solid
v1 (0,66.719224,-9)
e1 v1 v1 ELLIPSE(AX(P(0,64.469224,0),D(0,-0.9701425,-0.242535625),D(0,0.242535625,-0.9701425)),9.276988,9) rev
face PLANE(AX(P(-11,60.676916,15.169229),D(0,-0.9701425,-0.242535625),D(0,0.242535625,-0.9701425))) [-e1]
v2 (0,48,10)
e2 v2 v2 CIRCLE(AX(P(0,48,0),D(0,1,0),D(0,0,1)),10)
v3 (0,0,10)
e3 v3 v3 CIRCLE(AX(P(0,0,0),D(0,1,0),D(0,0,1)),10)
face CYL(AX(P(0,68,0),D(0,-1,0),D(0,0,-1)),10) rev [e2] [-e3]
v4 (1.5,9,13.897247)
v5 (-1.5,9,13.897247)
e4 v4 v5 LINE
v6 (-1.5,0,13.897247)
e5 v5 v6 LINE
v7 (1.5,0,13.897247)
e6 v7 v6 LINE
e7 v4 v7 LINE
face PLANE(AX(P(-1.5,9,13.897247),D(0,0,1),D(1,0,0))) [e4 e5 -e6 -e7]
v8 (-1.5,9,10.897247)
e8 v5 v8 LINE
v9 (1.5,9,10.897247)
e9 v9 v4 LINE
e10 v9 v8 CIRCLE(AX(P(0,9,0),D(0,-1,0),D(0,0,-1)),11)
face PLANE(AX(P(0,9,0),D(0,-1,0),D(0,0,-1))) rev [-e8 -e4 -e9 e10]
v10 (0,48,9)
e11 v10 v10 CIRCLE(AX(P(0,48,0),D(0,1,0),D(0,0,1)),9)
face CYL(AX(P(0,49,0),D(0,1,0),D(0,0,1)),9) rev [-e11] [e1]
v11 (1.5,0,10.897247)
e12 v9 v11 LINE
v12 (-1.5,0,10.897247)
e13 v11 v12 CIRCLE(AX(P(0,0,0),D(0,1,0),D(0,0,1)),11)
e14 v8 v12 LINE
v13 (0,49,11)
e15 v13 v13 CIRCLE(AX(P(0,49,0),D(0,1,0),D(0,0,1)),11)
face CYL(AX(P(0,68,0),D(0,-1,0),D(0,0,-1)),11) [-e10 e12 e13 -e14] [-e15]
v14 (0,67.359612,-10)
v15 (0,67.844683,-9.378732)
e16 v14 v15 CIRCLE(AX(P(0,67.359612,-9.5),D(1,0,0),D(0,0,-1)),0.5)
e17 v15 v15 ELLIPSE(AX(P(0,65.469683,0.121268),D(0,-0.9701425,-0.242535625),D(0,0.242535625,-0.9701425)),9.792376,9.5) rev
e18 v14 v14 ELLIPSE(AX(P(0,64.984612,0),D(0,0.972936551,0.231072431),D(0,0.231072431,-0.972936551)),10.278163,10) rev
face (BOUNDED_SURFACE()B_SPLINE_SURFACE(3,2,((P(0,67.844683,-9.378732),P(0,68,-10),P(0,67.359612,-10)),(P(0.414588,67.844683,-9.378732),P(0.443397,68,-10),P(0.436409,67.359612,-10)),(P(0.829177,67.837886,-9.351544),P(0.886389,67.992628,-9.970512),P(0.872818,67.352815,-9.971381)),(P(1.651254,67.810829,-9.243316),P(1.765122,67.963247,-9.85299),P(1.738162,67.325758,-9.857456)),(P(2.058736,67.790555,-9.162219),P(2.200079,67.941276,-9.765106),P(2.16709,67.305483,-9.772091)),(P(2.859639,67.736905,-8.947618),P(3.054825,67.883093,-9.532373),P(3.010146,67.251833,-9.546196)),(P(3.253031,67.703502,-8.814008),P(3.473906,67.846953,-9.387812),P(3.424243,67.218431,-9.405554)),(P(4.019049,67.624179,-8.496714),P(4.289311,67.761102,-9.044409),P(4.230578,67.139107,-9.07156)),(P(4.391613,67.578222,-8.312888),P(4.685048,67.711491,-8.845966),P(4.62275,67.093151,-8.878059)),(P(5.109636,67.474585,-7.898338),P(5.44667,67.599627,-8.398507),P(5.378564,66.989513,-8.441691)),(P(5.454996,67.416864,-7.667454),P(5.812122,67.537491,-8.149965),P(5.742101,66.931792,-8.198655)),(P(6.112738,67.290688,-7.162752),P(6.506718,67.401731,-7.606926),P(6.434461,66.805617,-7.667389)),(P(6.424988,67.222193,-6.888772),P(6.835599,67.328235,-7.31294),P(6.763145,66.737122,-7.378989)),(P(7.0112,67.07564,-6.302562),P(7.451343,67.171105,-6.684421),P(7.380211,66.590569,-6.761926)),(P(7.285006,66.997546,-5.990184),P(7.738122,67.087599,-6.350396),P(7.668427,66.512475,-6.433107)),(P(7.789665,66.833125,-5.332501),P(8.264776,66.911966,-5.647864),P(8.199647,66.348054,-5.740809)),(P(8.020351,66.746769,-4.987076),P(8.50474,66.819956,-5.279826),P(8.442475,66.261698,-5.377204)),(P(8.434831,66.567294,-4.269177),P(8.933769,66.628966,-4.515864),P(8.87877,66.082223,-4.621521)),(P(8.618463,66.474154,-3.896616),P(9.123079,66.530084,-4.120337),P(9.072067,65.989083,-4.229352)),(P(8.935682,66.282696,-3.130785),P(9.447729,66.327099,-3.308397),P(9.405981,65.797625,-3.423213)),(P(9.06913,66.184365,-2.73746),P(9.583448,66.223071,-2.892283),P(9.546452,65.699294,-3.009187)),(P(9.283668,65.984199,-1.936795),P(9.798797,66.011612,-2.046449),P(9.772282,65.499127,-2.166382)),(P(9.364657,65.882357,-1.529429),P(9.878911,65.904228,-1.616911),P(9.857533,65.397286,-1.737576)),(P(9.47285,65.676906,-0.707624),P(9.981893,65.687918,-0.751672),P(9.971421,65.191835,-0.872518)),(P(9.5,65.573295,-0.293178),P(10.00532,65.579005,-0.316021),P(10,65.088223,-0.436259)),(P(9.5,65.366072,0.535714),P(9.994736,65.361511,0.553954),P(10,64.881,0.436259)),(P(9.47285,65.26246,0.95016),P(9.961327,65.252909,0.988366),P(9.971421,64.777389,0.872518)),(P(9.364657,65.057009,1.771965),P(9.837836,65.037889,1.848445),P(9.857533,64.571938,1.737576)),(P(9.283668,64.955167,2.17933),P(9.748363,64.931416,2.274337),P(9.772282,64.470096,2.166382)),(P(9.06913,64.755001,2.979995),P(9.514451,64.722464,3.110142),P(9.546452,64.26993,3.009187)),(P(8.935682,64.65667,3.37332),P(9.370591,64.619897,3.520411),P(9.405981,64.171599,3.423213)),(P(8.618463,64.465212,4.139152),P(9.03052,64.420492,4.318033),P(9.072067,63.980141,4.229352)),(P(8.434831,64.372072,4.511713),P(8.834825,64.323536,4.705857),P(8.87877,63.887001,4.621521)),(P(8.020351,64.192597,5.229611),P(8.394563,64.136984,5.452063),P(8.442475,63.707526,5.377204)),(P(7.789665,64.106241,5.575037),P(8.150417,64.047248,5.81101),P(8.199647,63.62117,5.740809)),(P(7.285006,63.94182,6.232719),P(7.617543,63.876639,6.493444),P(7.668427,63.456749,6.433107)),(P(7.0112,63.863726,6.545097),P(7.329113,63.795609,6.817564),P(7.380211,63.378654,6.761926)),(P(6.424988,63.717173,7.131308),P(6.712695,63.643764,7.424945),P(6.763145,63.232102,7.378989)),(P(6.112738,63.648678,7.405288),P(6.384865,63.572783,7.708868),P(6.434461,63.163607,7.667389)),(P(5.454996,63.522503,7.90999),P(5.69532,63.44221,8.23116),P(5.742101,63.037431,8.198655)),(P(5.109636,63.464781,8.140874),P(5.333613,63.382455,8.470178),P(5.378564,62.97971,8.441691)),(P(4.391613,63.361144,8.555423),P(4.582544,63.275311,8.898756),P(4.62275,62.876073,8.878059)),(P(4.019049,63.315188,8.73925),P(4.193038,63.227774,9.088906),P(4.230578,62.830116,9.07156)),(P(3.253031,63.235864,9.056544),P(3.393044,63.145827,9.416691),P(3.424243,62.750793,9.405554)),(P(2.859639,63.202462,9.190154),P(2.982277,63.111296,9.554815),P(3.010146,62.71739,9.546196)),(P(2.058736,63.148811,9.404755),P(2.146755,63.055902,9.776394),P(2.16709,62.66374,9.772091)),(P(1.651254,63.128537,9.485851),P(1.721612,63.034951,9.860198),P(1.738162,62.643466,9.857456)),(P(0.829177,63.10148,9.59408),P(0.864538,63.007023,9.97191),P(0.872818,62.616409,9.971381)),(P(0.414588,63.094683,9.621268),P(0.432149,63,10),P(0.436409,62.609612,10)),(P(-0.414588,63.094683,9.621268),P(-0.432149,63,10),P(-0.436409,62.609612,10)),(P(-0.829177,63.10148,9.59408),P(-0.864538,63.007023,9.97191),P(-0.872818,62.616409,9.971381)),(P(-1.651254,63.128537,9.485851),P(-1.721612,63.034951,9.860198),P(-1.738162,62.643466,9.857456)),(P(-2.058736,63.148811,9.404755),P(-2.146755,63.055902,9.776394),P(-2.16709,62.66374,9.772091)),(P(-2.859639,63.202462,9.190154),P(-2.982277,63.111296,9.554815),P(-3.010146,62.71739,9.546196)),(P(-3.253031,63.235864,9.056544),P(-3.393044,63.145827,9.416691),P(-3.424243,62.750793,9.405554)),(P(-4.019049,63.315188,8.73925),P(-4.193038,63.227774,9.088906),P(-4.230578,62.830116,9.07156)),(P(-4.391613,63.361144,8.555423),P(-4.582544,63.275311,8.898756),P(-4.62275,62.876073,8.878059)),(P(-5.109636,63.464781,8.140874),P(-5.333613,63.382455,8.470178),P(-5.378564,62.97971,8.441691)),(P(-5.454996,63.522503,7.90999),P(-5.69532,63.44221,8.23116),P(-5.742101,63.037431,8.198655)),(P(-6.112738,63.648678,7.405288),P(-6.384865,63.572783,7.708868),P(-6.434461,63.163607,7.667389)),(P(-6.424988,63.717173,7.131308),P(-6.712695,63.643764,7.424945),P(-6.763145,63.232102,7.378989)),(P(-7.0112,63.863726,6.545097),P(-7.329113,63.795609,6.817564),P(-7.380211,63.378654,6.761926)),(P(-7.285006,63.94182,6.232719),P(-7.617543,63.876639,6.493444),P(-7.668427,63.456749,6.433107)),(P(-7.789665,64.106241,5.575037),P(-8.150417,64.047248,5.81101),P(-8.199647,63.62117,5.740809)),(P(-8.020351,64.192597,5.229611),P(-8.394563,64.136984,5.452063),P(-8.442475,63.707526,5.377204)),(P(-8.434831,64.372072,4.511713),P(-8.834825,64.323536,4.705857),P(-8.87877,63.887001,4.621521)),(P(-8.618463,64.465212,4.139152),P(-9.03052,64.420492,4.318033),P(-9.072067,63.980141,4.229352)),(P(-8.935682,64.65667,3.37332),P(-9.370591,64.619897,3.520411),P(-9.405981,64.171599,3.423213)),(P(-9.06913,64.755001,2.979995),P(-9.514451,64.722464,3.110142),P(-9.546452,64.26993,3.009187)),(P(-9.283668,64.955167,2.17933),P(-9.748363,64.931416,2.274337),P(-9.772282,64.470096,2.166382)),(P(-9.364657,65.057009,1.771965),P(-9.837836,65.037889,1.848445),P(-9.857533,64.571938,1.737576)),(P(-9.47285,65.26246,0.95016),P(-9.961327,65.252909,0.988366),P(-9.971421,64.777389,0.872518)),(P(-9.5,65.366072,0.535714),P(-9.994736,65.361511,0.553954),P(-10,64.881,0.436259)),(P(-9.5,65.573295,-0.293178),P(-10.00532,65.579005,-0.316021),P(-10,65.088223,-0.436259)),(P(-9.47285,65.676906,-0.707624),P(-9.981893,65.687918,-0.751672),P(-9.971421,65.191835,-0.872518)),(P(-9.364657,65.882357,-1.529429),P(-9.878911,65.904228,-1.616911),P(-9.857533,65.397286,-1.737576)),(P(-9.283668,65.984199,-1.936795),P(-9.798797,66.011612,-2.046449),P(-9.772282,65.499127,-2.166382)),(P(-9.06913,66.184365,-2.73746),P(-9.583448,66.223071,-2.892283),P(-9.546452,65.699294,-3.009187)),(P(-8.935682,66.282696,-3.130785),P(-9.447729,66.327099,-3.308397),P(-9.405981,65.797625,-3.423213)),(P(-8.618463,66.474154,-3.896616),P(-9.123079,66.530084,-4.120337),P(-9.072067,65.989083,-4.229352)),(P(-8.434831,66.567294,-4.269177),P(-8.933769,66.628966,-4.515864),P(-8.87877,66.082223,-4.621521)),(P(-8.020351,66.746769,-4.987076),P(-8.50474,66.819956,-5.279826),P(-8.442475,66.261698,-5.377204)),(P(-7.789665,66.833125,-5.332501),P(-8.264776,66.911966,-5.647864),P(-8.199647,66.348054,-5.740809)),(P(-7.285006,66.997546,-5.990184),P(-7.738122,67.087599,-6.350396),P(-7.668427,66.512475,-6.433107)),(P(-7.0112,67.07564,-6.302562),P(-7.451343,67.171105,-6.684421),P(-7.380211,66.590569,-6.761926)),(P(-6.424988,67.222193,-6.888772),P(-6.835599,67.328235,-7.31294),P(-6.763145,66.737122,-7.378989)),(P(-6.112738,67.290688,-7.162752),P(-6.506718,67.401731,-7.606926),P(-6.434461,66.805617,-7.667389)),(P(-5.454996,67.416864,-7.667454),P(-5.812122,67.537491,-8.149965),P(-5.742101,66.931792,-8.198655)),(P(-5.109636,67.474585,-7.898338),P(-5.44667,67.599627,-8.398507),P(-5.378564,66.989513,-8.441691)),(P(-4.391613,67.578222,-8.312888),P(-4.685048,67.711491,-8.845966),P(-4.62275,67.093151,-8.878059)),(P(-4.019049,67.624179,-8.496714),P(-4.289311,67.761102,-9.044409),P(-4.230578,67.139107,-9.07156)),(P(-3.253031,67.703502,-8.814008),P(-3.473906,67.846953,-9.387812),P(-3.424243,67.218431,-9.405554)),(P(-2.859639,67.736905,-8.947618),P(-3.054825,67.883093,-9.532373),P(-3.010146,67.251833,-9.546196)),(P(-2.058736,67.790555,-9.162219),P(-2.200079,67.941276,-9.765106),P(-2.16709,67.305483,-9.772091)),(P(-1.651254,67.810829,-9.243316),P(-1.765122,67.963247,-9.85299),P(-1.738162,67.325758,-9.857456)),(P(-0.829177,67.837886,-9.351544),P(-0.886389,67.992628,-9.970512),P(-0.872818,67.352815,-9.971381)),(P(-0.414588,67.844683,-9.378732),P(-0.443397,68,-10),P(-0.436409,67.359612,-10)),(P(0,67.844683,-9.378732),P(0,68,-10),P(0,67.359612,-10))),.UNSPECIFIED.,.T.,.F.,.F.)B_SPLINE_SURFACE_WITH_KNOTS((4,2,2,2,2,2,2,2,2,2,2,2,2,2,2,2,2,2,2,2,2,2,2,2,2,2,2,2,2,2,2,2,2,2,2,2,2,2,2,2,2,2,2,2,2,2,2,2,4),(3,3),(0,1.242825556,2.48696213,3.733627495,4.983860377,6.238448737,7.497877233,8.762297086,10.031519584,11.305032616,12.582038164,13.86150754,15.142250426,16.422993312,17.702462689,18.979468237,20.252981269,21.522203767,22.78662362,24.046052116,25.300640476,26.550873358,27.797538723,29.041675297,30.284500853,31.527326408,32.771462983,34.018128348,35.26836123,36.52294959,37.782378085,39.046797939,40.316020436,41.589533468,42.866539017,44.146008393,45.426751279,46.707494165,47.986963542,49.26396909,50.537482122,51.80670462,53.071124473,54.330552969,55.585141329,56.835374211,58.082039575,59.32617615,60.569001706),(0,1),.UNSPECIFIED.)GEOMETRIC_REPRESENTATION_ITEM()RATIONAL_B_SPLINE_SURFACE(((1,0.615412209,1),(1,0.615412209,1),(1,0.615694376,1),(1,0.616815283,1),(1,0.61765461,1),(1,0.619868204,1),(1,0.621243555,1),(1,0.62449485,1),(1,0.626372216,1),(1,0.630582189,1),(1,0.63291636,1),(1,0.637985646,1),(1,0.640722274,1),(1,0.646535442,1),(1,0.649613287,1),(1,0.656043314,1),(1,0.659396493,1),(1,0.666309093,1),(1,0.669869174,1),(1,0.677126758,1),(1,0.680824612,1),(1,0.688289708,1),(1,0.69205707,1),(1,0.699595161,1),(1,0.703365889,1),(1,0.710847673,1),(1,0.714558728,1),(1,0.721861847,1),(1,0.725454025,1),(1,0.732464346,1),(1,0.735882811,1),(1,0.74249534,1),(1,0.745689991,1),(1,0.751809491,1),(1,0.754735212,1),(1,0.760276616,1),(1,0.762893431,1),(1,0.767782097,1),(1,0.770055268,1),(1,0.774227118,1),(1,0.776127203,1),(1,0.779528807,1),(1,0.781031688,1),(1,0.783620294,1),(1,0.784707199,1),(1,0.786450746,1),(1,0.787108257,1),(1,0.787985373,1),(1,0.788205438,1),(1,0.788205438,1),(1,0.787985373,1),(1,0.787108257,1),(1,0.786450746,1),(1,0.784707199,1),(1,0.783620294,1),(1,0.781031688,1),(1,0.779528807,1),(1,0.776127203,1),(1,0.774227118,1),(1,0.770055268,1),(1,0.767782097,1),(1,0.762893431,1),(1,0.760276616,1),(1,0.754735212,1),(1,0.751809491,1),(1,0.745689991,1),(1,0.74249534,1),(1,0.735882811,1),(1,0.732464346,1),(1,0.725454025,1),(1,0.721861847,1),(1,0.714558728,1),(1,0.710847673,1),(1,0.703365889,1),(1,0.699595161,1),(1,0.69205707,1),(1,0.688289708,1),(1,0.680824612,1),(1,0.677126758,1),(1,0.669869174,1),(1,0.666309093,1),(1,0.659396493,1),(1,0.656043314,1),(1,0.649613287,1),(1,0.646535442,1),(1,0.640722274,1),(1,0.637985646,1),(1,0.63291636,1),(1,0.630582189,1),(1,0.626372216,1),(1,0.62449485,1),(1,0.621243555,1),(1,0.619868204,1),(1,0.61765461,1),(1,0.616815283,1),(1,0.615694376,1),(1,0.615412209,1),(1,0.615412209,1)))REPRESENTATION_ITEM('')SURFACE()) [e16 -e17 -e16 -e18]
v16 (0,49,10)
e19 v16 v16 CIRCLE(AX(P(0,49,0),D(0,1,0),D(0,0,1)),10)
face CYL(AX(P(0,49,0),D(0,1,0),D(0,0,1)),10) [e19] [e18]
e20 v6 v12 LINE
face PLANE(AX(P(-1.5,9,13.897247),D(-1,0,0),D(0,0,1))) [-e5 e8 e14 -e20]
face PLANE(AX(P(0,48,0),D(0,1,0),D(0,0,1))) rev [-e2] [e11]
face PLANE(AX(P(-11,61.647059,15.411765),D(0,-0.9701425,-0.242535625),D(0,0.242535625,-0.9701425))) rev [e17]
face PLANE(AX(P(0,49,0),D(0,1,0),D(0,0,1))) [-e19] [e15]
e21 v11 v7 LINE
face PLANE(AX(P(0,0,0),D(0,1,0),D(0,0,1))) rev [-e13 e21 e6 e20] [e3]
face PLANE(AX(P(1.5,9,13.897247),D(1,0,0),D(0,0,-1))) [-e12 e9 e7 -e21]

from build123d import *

# Parameters (mm, degrees)
SKETCH_1_R               = 11
EXTRUDE_1_DEPTH          = 68
CUT_EXTRUDE_START        = -19
SKETCH_2_R               = 11
SKETCH_2_R_2             = 10
CUT_EXTRUDE_1_DEPTH      = 19
CUT_EXTRUDE_2_DEPTH      = 70.756720106
CUT_EXTRUDE_2_DEPTH_BACK = 70.756720106
FILLET_1_R               = 0.5
SHELL_2_T                = -1
SKETCH_5_W               = 3
SKETCH_5_H               = 3
EXTRUDE_2_DEPTH          = 9


with BuildPart() as part:
    # ｽｹｯﾁ1 → ﾎﾞｽ - 押し出し1 (new body)
    with BuildSketch(Plane(origin=(0, 0, 0), x_dir=(1, 0, 0), z_dir=(0, 1, 0))):
        Circle(SKETCH_1_R)
    extrude(amount=EXTRUDE_1_DEPTH)

    # ｽｹｯﾁ2 → ｶｯﾄ - 押し出し1 (cut)
    with BuildSketch(Plane(origin=(0, 68, 0), x_dir=(1, 0, 0), z_dir=(0, 1, 0)).offset(CUT_EXTRUDE_START)):
        Circle(SKETCH_2_R)
        Circle(SKETCH_2_R_2, mode=Mode.SUBTRACT)
    extrude(amount=CUT_EXTRUDE_1_DEPTH, mode=Mode.SUBTRACT)

    # ｽｹｯﾁ3 → ｶｯﾄ - 押し出し2 (cut, two sides: drawn at the far end of the back side and taken through both)
    with BuildSketch(Plane(origin=(0, 0, 0), x_dir=(0, 0, -1), z_dir=(1, 0, 0)).offset(-CUT_EXTRUDE_2_DEPTH_BACK)):
        Polygon((-10, 63), (10, 68), (-10, 68), align=None)
    extrude(amount=CUT_EXTRUDE_2_DEPTH + CUT_EXTRUDE_2_DEPTH_BACK, mode=Mode.SUBTRACT)

    # ﾌｨﾚｯﾄ1
    fillet_1_edges = [part.edges().sort_by_distance(p)[0] for p in [
        (-10, 65.500000009, -3.7e-08),
    ]]
    fillet(fillet_1_edges, radius=FILLET_1_R)

    # ｼｪﾙ2
    shell_2_openings = [part.faces().sort_by_distance(p)[0] for p in [
        (0, 0, 0),
    ]]
    offset(amount=SHELL_2_T, openings=shell_2_openings, kind=Kind.INTERSECTION)

    # ｽｹｯﾁ5 → ﾎﾞｽ - 押し出し2 (add)
    with BuildSketch(Plane.XZ):
        with Locations((0, 12.397247359)):
            Rectangle(SKETCH_5_W, SKETCH_5_H)
    extrude(amount=-EXTRUDE_2_DEPTH)


solid = part.part
